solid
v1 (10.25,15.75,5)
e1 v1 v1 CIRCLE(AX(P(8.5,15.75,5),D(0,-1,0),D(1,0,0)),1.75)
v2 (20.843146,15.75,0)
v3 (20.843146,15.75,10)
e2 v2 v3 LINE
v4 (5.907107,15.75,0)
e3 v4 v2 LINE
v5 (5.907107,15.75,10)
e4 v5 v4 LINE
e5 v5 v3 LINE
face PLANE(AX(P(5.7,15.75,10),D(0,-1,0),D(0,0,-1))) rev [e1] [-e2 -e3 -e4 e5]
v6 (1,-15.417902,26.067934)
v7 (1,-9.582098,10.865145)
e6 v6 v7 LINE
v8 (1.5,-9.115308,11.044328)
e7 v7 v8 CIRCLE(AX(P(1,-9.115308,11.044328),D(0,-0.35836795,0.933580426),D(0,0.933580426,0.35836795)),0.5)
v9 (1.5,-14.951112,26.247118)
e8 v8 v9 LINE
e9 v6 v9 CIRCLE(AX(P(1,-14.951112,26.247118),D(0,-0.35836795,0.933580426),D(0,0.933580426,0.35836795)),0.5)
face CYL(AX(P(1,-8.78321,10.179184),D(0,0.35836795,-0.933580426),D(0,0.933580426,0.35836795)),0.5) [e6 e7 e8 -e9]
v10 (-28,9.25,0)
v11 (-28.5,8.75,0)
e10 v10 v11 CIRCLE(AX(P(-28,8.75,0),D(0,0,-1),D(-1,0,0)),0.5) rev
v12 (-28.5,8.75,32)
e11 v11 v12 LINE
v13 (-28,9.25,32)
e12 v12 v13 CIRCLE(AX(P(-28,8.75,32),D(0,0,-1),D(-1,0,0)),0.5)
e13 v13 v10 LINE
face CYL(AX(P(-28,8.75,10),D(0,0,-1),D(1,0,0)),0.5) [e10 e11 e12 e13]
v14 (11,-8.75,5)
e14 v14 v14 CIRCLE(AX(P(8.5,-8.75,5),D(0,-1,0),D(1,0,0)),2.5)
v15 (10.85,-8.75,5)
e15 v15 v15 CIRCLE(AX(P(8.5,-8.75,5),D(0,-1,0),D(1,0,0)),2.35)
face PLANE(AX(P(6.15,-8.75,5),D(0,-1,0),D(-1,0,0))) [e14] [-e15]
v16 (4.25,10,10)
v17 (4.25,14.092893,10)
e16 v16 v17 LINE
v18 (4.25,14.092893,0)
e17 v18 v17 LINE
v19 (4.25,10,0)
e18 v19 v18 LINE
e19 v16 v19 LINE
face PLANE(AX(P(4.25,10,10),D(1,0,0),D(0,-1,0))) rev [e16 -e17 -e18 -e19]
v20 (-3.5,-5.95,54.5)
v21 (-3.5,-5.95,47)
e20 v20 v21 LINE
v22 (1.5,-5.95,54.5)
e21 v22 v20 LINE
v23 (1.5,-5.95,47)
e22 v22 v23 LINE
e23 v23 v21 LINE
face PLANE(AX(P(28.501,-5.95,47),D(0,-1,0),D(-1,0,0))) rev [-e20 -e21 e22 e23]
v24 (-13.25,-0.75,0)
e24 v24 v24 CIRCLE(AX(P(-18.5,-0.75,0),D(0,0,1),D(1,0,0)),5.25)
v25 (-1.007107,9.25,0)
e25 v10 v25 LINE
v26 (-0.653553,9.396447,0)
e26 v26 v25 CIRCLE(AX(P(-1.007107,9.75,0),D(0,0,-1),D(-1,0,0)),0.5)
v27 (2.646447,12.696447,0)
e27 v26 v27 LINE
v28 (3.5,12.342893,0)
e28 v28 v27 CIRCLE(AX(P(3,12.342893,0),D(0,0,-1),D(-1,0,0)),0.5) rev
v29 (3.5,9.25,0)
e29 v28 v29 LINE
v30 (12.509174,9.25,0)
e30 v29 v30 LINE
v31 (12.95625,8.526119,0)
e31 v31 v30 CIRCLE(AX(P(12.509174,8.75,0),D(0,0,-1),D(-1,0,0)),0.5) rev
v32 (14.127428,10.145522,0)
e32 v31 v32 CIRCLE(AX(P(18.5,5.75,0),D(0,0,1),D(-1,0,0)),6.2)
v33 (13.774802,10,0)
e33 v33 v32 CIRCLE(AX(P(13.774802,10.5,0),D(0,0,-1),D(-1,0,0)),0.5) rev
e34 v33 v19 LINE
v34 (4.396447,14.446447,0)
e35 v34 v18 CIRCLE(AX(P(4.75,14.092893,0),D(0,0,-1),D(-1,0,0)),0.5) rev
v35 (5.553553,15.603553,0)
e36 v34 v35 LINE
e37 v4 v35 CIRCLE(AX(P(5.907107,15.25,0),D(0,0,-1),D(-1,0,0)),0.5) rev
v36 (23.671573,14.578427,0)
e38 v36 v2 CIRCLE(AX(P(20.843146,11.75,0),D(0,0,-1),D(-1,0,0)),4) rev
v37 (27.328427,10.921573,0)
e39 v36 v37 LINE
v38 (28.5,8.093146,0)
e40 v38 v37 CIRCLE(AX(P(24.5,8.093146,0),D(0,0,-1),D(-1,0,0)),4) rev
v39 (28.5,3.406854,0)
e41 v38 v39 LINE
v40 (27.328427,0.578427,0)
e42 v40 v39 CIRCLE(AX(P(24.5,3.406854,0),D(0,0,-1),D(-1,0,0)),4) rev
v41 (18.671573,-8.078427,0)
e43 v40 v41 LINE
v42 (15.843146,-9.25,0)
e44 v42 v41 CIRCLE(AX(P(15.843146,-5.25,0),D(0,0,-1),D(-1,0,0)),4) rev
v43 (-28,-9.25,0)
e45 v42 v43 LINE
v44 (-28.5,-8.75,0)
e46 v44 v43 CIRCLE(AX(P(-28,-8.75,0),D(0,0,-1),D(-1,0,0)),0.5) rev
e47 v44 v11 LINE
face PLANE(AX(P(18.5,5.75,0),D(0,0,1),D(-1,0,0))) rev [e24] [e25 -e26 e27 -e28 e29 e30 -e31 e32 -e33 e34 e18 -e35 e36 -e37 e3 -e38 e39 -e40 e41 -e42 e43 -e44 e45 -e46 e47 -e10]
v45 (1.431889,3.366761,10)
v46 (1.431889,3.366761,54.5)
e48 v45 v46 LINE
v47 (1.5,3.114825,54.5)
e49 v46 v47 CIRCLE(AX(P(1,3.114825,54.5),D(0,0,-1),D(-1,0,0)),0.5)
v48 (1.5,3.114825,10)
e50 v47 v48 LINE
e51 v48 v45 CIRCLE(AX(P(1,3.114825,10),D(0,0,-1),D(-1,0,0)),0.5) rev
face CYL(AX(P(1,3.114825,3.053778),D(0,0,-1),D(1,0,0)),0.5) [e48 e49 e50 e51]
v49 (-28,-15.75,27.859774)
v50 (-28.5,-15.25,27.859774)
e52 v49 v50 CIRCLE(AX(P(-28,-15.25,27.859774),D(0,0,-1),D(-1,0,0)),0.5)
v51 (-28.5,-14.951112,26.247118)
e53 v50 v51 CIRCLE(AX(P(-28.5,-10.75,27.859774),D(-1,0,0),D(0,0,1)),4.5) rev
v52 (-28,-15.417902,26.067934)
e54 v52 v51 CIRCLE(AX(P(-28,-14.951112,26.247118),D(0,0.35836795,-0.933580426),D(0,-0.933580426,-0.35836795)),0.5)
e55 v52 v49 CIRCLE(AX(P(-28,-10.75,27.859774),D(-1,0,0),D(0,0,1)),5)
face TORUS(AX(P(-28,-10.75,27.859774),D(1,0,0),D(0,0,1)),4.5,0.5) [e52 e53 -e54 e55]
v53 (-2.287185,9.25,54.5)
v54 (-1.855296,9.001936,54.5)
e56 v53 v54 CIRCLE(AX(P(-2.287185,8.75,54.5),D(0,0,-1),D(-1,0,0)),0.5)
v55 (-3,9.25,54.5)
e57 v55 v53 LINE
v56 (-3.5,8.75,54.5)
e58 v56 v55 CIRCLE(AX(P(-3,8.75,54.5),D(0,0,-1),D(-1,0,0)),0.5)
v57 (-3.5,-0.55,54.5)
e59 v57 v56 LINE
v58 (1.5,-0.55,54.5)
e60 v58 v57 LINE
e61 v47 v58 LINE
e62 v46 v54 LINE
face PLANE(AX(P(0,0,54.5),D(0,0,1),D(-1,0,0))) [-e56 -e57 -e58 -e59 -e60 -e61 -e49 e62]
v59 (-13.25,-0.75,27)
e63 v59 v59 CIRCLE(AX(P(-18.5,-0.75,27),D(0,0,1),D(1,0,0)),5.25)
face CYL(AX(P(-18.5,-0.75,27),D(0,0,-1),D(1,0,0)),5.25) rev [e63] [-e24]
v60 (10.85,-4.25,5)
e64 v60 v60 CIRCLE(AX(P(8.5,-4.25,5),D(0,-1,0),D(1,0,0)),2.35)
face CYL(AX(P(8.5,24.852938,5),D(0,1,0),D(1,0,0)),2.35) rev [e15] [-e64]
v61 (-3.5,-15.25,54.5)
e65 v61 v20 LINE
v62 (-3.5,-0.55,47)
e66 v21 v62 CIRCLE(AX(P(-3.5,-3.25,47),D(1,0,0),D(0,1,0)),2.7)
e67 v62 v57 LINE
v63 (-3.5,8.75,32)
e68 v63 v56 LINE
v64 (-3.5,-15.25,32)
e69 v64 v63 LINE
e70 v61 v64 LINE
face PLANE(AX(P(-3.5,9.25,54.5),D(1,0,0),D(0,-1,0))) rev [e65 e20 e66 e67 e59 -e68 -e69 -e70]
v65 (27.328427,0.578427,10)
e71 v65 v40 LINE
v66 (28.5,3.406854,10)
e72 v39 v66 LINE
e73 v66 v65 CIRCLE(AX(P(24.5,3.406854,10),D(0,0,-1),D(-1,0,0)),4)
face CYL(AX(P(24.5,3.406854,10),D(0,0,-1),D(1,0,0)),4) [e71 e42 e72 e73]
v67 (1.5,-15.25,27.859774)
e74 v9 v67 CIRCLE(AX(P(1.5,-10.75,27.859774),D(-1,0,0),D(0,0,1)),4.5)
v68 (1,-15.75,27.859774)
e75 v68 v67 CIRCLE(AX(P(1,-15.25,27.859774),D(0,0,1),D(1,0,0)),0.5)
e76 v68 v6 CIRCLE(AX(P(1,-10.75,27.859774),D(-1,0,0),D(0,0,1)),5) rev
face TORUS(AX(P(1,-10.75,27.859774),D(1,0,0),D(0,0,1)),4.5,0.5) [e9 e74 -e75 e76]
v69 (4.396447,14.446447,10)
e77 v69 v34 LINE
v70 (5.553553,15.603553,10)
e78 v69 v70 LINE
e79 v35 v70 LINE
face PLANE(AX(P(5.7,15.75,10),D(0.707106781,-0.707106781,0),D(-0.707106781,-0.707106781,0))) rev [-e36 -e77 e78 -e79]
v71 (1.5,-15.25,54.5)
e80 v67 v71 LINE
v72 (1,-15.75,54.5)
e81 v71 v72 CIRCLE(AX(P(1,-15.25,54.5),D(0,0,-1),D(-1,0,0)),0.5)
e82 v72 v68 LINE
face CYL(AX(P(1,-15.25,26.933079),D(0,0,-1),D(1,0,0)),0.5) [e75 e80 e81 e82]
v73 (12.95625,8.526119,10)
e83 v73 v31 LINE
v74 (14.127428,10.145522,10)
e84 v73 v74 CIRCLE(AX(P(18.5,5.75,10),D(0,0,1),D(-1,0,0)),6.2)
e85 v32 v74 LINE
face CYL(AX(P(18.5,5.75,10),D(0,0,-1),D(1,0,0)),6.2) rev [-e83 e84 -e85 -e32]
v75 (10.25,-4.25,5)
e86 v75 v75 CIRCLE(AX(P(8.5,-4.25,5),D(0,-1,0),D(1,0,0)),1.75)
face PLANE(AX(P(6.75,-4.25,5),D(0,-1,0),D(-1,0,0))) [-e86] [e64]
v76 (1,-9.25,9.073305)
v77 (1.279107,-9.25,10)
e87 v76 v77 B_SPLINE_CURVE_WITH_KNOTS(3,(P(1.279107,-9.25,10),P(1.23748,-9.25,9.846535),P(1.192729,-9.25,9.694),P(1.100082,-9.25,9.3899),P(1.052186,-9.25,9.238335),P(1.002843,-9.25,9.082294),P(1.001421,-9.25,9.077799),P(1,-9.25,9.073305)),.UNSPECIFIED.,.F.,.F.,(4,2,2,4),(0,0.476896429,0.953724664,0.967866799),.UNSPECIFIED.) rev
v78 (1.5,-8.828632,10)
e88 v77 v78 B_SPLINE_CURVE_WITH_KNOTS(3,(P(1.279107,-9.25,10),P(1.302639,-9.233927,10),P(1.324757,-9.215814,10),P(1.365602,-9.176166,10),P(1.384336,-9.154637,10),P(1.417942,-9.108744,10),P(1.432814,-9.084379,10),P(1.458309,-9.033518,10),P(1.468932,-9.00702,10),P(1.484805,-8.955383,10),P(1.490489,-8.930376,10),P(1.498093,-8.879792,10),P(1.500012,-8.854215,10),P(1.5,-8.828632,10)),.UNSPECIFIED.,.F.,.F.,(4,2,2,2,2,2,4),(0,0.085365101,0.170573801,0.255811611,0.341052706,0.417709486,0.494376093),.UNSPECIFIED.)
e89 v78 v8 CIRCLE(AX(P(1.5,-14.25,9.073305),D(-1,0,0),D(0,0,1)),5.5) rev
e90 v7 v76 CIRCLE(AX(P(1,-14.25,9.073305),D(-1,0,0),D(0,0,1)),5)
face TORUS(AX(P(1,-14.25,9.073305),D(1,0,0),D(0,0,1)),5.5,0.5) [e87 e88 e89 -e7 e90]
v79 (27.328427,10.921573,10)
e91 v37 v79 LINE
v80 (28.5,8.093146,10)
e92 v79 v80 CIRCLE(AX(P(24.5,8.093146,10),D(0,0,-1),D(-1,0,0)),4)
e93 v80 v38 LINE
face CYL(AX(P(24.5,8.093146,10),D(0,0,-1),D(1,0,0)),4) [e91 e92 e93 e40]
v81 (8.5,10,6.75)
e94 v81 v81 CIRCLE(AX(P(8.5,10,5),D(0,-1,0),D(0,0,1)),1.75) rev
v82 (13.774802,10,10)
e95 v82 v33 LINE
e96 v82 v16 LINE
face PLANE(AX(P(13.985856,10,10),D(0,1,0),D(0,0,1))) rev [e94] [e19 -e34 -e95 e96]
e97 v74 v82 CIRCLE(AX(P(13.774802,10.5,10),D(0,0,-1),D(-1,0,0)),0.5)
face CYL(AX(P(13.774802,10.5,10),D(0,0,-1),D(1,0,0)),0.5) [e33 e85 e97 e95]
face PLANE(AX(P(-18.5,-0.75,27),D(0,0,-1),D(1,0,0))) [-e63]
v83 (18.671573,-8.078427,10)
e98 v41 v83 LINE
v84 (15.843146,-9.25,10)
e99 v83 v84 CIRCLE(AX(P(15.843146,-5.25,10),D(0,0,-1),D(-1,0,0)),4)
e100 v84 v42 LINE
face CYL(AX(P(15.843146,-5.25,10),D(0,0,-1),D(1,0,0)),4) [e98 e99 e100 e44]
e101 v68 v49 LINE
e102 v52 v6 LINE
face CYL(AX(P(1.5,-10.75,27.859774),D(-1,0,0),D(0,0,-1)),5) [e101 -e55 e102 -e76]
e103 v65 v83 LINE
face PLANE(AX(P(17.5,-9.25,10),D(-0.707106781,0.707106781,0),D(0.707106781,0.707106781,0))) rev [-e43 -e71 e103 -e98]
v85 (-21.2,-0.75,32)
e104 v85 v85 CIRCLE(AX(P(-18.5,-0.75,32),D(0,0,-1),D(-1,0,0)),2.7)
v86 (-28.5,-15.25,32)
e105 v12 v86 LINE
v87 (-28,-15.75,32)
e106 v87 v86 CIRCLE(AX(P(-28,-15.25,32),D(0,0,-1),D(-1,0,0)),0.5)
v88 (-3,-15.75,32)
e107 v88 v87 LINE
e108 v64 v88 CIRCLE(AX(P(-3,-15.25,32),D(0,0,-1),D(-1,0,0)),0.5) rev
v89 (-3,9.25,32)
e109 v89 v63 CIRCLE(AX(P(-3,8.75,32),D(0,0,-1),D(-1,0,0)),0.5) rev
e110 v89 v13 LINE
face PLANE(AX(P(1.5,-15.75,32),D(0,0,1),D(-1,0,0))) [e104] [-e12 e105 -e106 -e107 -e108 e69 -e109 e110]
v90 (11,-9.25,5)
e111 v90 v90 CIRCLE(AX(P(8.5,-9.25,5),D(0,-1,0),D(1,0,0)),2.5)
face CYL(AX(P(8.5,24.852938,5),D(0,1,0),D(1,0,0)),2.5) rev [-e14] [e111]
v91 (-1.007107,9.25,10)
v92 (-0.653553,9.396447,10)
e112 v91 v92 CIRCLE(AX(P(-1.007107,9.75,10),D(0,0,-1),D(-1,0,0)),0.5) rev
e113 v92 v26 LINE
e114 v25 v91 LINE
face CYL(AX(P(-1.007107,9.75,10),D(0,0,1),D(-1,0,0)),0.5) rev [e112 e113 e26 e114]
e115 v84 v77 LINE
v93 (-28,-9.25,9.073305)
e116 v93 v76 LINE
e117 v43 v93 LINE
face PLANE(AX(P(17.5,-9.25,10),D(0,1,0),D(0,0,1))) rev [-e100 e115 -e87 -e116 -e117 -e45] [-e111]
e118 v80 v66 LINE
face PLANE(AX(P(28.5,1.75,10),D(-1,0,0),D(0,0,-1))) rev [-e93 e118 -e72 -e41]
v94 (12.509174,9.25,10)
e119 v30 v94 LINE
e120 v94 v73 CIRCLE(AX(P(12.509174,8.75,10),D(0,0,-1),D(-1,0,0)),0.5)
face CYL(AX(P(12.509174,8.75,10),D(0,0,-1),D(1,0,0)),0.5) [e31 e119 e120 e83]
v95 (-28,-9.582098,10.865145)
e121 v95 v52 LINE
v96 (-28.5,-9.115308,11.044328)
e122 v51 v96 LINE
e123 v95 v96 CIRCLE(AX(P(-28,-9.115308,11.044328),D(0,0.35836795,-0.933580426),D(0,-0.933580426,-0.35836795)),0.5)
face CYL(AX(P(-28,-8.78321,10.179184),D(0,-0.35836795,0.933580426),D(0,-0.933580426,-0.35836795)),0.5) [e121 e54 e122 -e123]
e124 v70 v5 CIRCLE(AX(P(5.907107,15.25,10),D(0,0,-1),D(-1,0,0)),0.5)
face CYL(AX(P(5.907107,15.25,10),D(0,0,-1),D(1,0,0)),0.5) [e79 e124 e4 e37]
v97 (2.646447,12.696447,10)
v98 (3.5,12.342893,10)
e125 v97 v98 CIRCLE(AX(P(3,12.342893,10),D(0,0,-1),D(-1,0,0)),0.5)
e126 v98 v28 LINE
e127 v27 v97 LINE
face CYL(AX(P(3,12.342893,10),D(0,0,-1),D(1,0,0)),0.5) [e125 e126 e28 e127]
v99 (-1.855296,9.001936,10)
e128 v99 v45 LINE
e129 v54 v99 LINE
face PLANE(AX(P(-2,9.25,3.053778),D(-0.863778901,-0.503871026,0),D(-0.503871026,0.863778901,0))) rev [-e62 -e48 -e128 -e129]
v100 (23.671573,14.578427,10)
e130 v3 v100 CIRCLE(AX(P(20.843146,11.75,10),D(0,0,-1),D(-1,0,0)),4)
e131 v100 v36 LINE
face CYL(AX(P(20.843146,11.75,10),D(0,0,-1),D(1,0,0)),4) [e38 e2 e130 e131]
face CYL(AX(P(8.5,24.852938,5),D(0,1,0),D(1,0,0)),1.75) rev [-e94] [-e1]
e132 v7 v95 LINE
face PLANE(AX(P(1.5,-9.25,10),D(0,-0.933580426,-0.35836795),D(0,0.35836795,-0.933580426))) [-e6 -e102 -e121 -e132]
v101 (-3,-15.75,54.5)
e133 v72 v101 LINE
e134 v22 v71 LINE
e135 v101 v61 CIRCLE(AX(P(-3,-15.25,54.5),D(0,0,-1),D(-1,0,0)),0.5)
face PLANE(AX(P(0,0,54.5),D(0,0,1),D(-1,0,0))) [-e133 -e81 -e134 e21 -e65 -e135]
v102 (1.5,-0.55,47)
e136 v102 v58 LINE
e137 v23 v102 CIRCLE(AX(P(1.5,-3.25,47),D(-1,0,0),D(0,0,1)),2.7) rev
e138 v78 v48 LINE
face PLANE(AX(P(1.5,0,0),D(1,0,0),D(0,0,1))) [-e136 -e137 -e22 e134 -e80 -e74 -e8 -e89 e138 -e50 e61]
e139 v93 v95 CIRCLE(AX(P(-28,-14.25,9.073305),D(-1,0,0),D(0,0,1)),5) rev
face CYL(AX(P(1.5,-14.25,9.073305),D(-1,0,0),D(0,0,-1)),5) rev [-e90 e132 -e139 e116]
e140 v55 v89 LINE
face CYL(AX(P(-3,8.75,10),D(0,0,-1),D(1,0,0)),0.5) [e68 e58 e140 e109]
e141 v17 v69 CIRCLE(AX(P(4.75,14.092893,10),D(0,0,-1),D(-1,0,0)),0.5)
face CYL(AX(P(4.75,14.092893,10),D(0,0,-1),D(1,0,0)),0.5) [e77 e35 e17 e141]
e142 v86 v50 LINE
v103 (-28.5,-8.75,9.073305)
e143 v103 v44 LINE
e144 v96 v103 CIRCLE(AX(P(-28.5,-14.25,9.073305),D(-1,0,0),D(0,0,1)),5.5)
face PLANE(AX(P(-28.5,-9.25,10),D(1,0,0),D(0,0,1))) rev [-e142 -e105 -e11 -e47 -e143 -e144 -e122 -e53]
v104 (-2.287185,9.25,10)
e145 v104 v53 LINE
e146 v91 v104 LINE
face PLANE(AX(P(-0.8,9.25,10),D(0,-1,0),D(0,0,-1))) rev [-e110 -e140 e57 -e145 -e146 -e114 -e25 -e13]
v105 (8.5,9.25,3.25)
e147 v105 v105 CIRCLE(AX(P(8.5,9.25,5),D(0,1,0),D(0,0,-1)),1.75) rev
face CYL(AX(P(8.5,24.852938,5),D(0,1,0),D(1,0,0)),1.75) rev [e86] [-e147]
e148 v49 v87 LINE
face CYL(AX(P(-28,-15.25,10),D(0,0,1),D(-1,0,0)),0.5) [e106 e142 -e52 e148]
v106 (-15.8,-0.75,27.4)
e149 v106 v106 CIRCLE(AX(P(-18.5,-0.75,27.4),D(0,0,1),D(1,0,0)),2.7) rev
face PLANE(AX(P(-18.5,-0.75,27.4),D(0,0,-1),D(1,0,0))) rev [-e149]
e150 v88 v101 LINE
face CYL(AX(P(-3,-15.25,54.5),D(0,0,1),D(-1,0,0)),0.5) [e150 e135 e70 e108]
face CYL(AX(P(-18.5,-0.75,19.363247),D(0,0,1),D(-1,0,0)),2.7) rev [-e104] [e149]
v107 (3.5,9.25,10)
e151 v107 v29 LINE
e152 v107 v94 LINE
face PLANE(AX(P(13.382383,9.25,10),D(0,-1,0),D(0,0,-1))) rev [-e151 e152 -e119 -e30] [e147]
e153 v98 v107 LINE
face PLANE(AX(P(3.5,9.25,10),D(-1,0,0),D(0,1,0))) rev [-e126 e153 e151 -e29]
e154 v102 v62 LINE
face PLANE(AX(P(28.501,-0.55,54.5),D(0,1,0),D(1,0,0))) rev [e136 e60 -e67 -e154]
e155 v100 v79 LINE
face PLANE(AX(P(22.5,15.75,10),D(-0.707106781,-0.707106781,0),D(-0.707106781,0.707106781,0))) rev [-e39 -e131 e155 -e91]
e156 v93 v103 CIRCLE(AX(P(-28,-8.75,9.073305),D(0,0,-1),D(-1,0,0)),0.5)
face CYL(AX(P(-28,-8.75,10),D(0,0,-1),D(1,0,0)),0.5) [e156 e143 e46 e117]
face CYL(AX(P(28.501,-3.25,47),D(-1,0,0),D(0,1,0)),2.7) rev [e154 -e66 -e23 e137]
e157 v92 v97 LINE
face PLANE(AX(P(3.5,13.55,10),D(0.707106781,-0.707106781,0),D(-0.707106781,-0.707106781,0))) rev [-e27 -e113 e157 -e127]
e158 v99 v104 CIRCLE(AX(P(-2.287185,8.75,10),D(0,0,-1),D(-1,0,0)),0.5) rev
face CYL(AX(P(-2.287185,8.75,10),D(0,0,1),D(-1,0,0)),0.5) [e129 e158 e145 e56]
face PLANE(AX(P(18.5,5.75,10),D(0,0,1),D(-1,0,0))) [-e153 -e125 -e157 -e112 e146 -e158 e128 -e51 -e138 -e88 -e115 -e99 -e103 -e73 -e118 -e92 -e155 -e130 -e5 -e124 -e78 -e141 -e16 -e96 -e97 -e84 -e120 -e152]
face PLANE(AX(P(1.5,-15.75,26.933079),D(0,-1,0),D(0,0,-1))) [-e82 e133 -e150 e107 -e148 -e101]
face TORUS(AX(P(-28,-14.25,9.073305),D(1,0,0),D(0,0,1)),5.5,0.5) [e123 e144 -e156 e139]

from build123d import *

# Parameters (mm, degrees)
BOSS_EXTRUDE1_DEPTH = 10
BOSS_EXTRUDE2_DEPTH = 30
SKETCH3_W           = 5
SKETCH3_H           = 25
BOSS_EXTRUDE3_DEPTH = 22.5
SKETCH4_R           = 5.25
CUT_EXTRUDE1_DEPTH  = 27
SKETCH5_R           = 2.7
CUT_EXTRUDE3_DEPTH  = 4.6
CUT_EXTRUDE4_DEPTH  = 44.5
CUT_EXTRUDE5_REACH  = 67.133
FILLET1_R           = 4
FILLET2_R           = 0.5
FILLET3_R           = 5
FILLET4_R           = 0.5


with BuildPart() as part:
    # Sketch1 → Boss-Extrude1 (new body)
    with BuildSketch(Plane.XY):
        with BuildLine():
            Line((-22.5, 15.75), (-28.5, 9.75))
            Line((-28.5, 9.75), (-28.5, 9.25))
            Line((-28.5, 9.25), (-28.5, 1.75))
            Line((-28.5, 1.75), (-17.5, -9.25))
            Line((-17.5, -9.25), (28.5, -9.25))
            Line((28.5, -9.25), (28.5, 9.25))
            Line((28.5, 9.25), (0.8, 9.25))
            Line((0.8, 9.25), (-3.5, 13.55))
            Line((-3.5, 13.55), (-3.5, 9.25))
            Line((-3.5, 9.25), (-13.382383367, 9.25))
            ThreePointArc((-13.382383367, 9.25), (-23.330458604, 1.863270054), (-13.985855563, 10))
            Line((-13.985855563, 10), (-4.25, 10))
            Line((-4.25, 10), (-4.25, 14.3))
            Line((-4.25, 14.3), (-5.7, 15.75))
            Line((-5.7, 15.75), (-22.5, 15.75))
        make_face()
    extrude(amount=BOSS_EXTRUDE1_DEPTH)

    # Sketch2 → Boss-Extrude2 (add)
    with BuildSketch(Plane(origin=(28.5, 0, 0), x_dir=(0, 0, -1), z_dir=(1, 0, 0))):
        Polygon((-10, 9.25), (-10, -9.25), (-26.933078921, -15.75), (-32, -15.75), (-32, 9.25), align=None)
    extrude(amount=-BOSS_EXTRUDE2_DEPTH)

    # Sketch3 → Boss-Extrude3 (add)
    with BuildSketch(Plane.XY.offset(32)):
        with Locations((1, -3.25)):
            Rectangle(SKETCH3_W, SKETCH3_H)
    extrude(amount=BOSS_EXTRUDE3_DEPTH)

    # Sketch4 → Cut-Extrude1 (cut)
    with BuildSketch(Plane(origin=(0, 0, 0), x_dir=(-1, 0, 0), z_dir=(0, 0, -1))):
        with Locations((-18.5, -0.75)):
            Circle(SKETCH4_R)
    extrude(amount=-CUT_EXTRUDE1_DEPTH, mode=Mode.SUBTRACT)

    # Sketch5 → Cut-Extrude3 (cut)
    with BuildSketch(Plane.XY.offset(32)):
        with Locations((18.5, -0.75)):
            Circle(SKETCH5_R)
    extrude(amount=-CUT_EXTRUDE3_DEPTH, mode=Mode.SUBTRACT)

    # Sketch6 → Cut-Extrude4 (cut)
    with BuildSketch(Plane.XY.offset(54.5)):
        Polygon((-1.5, 9.25), (2, 9.25), (-1.5, 3.25), align=None)
    extrude(amount=-CUT_EXTRUDE4_DEPTH, mode=Mode.SUBTRACT)

    # Sketch7 → Cut-Extrude5 (cut, up to next)
    with BuildSketch(Plane(origin=(3.5, 0, 0), x_dir=(0, 0, -1), z_dir=(1, 0, 0)), mode=Mode.PRIVATE) as cut_extrude5_sk1:
        with BuildLine():
            Line((-47, -5.95), (-54.5, -5.95))
            Line((-54.5, -5.95), (-54.5, -0.55))
            Line((-54.5, -0.55), (-47, -0.55))
            ThreePointArc((-47, -0.55), (-44.3, -3.25), (-47, -5.95))
        make_face()
    cut_extrude5_tool1 = extrude(cut_extrude5_sk1.sketch, amount=-CUT_EXTRUDE5_REACH, mode=Mode.PRIVATE) & part.part
    add(cut_extrude5_tool1.solids().sort_by_distance((3.5, -3.25, 49.670838))[0], mode=Mode.SUBTRACT)

    # Fillet1
    fillet1_edges = [part.edges().sort_by_distance(p)[0] for p in [
        (-17.5, -9.25, 5),
        (-28.5, 1.75, 5),
        (-28.5, 9.75, 5),
        (-22.5, 15.75, 5),
    ]]
    fillet(fillet1_edges, radius=FILLET1_R)

    # Fillet2
    fillet2_edges = [part.edges().sort_by_distance(p)[0] for p in [
        (3.5, -15.75, 43.25),
        (3.5, 9.25, 43.25),
        (-1.5, 3.25, 32.25),
        (2, 9.25, 32.25),
        (-13.985855563, 10, 5),
        (-13.382383367, 9.25, 5),
        (-3.5, 13.55, 5),
        (-4.25, 14.3, 5),
        (28.5, 9.25, 16),
        (0.8, 9.25, 5),
        (-5.7, 15.75, 5),
    ]]
    fillet(fillet2_edges, radius=FILLET2_R)

    # Fillet3
    fillet3_edges = [part.edges().sort_by_distance(p)[0] for p in [
        (13.5, -9.25, 10),
        (13.5, -15.75, 26.933078921),
    ]]
    fillet(fillet3_edges, radius=FILLET3_R)

    # Fillet4
    # the kernel refuses this fillet: 0.5 mm, written as the material it takes off along each edge
    with BuildSketch(Plane(origin=(28.5, -15.75, 27.859774145), x_dir=(-1, 0, 0), z_dir=(0, 0, 1))) as fillet4_piece_1:
        with BuildLine():
            CenterArc((FILLET4_R, -FILLET4_R), FILLET4_R, 90, 90)
            Line((0, -FILLET4_R), (0, 0))
            Line((0, 0), (FILLET4_R, 0))
        make_face()
    extrude(amount=5.390225855, mode=Mode.SUBTRACT)
    with BuildSketch(Plane(origin=(28.5, -10.75, 27.859774145), x_dir=(0, -1, 0), z_dir=(0, 0, 1))) as fillet4_piece_2:
        with BuildLine():
            CenterArc((5 - FILLET4_R, -FILLET4_R), FILLET4_R, 0, 90)
            Line((5, -FILLET4_R), (5, 0))
            Line((5, 0), (5 - FILLET4_R, 0))
        make_face()
    revolve(axis=Axis((28.5, -10.75, 27.859774145), (1, 0, 0)), revolution_arc=21, mode=Mode.SUBTRACT)
    with BuildSketch(Plane(origin=(28.5, -9.25, -1.25), x_dir=(0, 1, 0), z_dir=(0, 0, 1))) as fillet4_piece_3:
        with BuildLine():
            CenterArc((FILLET4_R, FILLET4_R), FILLET4_R, 180, 90)
            Line((0, FILLET4_R), (0, 0))
            Line((0, 0), (FILLET4_R, 0))
        make_face()
    extrude(amount=10.323304775, mode=Mode.SUBTRACT)
    with BuildSketch(Plane(origin=(28.5, -14.25, 9.073304775), x_dir=(0, 0.9335804264972017, 0.35836794954530055), z_dir=(0, -0.35836794954530055, 0.9335804264972017))) as fillet4_piece_4:
        with BuildLine():
            CenterArc((5 + FILLET4_R, FILLET4_R), FILLET4_R, 180, 90)
            Line((5, FILLET4_R), (5, 0))
            Line((5, 0), (5 + FILLET4_R, 0))
        make_face()
    revolve(axis=Axis((28.5, -14.25, 9.073304775), (-1, 0, 0)), revolution_arc=21, mode=Mode.SUBTRACT)
    with BuildSketch(Plane(origin=(-1.5, -14.25, 9.073304775), x_dir=(0, 0.9335804264972017, 0.35836794954530055), z_dir=(0, -0.35836794954530055, 0.9335804264972017))) as fillet4_piece_5_section:
        with BuildLine():
            CenterArc((5 + FILLET4_R, -FILLET4_R), FILLET4_R, 90, 90)
            Line((5, -FILLET4_R), (5, 0))
            Line((5, 0), (5 + FILLET4_R, 0))
        make_face()
    fillet4_piece_5 = revolve(axis=Axis((-1.5, -14.25, 9.073304775), (-1, 0, 0)), revolution_arc=35.324258071, mode=Mode.PRIVATE)
    fillet4_piece_5 = split(fillet4_piece_5, bisect_by=Plane(origin=(-1.457320012, -9.164080053, 10), z_dir=(0, 0, 1)), keep=Keep.TOP, mode=Mode.PRIVATE)
    add(fillet4_piece_5, mode=Mode.SUBTRACT)
    with BuildSketch(Plane(origin=(-1.5, -14.25, 9.073304775), x_dir=(0, 0.9335804264972017, 0.35836794954530055), z_dir=(0, -0.35836794954530055, 0.9335804264972017))) as fillet4_piece_6_section:
        with BuildLine():
            CenterArc((5 + FILLET4_R, -FILLET4_R), FILLET4_R, 90, 90)
            Line((5, -FILLET4_R), (5, 0))
            Line((5, 0), (5 + FILLET4_R, 0))
        make_face()
    fillet4_piece_6 = revolve(axis=Axis((-1.5, -14.25, 9.073304775), (-1, 0, 0)), revolution_arc=35.324258071, mode=Mode.PRIVATE)
    fillet4_piece_6 = split(fillet4_piece_6, bisect_by=Plane(origin=(-1.316288707, -9.25, 9.750524402), z_dir=(0, -1, 0)), keep=Keep.TOP, mode=Mode.PRIVATE)
    add(fillet4_piece_6, mode=Mode.SUBTRACT)
    with BuildSketch(Plane(origin=(-1.5, -9.582097868, 10.865144523), x_dir=(0, 0.9335804264972015, 0.3583679495453009), z_dir=(0, -0.3583679495453009, 0.9335804264972015))) as fillet4_piece_7:
        with BuildLine():
            CenterArc((FILLET4_R, -FILLET4_R), FILLET4_R, 90, 90)
            Line((0, -FILLET4_R), (0, 0))
            Line((0, 0), (FILLET4_R, 0))
        make_face()
    extrude(amount=16.284392263, mode=Mode.SUBTRACT)
    with BuildSketch(Plane(origin=(28.5, -9.582097868, 10.865144523), x_dir=(0, 0.9335804264972015, 0.3583679495453009), z_dir=(0, -0.3583679495453009, 0.9335804264972015))) as fillet4_piece_8:
        with BuildLine():
            CenterArc((FILLET4_R, FILLET4_R), FILLET4_R, 180, 90)
            Line((0, FILLET4_R), (0, 0))
            Line((0, 0), (FILLET4_R, 0))
        make_face()
    extrude(amount=16.284392263, mode=Mode.SUBTRACT)
    with BuildSketch(Plane(origin=(-1.5, -10.75, 27.859774145), x_dir=(0, -1, 0), z_dir=(0, 0, 1))) as fillet4_piece_9:
        with BuildLine():
            CenterArc((5 - FILLET4_R, FILLET4_R), FILLET4_R, 270, 90)
            Line((5 - FILLET4_R, 0), (5, 0))
            Line((5, 0), (5, FILLET4_R))
        make_face()
    revolve(axis=Axis((-1.5, -10.75, 27.859774145), (1, 0, 0)), revolution_arc=21, mode=Mode.SUBTRACT)
    with BuildSketch(Plane(origin=(-1.5, -15.75, 27.859774145), x_dir=(1, 0, 0), z_dir=(0, 0, 1))) as fillet4_piece_10:
        with BuildLine():
            CenterArc((FILLET4_R, FILLET4_R), FILLET4_R, 180, 90)
            Line((0, FILLET4_R), (0, 0))
            Line((0, 0), (FILLET4_R, 0))
        make_face()
    extrude(amount=27.890225855, mode=Mode.SUBTRACT)

    # Sketch8 → Cut-Revolve1 (revolve, cut)
    with BuildSketch(Plane.XY.offset(5), mode=Mode.PRIVATE) as cut_revolve1_sk:
        Polygon((-8.5, 15.75), (-6.75, 15.75), (-6.75, -4.25), (-6.15, -4.25), (-6.15, -8.75), (-6, -8.75), (-6, -9.25), (-8.5, -9.25), align=None)
    revolve(cut_revolve1_sk.sketch.rotate(Axis((-8.5, 24.852937644, 5), (0, -1, 0)), 180), axis=Axis((-8.5, 24.852937644, 5), (0, -1, 0)), mode=Mode.SUBTRACT)


with BuildPart() as body_2:
    # Mirror1: mirrored copy
    add(part.part.mirror(Plane(origin=(0, 0, 0), x_dir=(0, 0, 1), z_dir=(1, 0, 0))))


solid = body_2.part
